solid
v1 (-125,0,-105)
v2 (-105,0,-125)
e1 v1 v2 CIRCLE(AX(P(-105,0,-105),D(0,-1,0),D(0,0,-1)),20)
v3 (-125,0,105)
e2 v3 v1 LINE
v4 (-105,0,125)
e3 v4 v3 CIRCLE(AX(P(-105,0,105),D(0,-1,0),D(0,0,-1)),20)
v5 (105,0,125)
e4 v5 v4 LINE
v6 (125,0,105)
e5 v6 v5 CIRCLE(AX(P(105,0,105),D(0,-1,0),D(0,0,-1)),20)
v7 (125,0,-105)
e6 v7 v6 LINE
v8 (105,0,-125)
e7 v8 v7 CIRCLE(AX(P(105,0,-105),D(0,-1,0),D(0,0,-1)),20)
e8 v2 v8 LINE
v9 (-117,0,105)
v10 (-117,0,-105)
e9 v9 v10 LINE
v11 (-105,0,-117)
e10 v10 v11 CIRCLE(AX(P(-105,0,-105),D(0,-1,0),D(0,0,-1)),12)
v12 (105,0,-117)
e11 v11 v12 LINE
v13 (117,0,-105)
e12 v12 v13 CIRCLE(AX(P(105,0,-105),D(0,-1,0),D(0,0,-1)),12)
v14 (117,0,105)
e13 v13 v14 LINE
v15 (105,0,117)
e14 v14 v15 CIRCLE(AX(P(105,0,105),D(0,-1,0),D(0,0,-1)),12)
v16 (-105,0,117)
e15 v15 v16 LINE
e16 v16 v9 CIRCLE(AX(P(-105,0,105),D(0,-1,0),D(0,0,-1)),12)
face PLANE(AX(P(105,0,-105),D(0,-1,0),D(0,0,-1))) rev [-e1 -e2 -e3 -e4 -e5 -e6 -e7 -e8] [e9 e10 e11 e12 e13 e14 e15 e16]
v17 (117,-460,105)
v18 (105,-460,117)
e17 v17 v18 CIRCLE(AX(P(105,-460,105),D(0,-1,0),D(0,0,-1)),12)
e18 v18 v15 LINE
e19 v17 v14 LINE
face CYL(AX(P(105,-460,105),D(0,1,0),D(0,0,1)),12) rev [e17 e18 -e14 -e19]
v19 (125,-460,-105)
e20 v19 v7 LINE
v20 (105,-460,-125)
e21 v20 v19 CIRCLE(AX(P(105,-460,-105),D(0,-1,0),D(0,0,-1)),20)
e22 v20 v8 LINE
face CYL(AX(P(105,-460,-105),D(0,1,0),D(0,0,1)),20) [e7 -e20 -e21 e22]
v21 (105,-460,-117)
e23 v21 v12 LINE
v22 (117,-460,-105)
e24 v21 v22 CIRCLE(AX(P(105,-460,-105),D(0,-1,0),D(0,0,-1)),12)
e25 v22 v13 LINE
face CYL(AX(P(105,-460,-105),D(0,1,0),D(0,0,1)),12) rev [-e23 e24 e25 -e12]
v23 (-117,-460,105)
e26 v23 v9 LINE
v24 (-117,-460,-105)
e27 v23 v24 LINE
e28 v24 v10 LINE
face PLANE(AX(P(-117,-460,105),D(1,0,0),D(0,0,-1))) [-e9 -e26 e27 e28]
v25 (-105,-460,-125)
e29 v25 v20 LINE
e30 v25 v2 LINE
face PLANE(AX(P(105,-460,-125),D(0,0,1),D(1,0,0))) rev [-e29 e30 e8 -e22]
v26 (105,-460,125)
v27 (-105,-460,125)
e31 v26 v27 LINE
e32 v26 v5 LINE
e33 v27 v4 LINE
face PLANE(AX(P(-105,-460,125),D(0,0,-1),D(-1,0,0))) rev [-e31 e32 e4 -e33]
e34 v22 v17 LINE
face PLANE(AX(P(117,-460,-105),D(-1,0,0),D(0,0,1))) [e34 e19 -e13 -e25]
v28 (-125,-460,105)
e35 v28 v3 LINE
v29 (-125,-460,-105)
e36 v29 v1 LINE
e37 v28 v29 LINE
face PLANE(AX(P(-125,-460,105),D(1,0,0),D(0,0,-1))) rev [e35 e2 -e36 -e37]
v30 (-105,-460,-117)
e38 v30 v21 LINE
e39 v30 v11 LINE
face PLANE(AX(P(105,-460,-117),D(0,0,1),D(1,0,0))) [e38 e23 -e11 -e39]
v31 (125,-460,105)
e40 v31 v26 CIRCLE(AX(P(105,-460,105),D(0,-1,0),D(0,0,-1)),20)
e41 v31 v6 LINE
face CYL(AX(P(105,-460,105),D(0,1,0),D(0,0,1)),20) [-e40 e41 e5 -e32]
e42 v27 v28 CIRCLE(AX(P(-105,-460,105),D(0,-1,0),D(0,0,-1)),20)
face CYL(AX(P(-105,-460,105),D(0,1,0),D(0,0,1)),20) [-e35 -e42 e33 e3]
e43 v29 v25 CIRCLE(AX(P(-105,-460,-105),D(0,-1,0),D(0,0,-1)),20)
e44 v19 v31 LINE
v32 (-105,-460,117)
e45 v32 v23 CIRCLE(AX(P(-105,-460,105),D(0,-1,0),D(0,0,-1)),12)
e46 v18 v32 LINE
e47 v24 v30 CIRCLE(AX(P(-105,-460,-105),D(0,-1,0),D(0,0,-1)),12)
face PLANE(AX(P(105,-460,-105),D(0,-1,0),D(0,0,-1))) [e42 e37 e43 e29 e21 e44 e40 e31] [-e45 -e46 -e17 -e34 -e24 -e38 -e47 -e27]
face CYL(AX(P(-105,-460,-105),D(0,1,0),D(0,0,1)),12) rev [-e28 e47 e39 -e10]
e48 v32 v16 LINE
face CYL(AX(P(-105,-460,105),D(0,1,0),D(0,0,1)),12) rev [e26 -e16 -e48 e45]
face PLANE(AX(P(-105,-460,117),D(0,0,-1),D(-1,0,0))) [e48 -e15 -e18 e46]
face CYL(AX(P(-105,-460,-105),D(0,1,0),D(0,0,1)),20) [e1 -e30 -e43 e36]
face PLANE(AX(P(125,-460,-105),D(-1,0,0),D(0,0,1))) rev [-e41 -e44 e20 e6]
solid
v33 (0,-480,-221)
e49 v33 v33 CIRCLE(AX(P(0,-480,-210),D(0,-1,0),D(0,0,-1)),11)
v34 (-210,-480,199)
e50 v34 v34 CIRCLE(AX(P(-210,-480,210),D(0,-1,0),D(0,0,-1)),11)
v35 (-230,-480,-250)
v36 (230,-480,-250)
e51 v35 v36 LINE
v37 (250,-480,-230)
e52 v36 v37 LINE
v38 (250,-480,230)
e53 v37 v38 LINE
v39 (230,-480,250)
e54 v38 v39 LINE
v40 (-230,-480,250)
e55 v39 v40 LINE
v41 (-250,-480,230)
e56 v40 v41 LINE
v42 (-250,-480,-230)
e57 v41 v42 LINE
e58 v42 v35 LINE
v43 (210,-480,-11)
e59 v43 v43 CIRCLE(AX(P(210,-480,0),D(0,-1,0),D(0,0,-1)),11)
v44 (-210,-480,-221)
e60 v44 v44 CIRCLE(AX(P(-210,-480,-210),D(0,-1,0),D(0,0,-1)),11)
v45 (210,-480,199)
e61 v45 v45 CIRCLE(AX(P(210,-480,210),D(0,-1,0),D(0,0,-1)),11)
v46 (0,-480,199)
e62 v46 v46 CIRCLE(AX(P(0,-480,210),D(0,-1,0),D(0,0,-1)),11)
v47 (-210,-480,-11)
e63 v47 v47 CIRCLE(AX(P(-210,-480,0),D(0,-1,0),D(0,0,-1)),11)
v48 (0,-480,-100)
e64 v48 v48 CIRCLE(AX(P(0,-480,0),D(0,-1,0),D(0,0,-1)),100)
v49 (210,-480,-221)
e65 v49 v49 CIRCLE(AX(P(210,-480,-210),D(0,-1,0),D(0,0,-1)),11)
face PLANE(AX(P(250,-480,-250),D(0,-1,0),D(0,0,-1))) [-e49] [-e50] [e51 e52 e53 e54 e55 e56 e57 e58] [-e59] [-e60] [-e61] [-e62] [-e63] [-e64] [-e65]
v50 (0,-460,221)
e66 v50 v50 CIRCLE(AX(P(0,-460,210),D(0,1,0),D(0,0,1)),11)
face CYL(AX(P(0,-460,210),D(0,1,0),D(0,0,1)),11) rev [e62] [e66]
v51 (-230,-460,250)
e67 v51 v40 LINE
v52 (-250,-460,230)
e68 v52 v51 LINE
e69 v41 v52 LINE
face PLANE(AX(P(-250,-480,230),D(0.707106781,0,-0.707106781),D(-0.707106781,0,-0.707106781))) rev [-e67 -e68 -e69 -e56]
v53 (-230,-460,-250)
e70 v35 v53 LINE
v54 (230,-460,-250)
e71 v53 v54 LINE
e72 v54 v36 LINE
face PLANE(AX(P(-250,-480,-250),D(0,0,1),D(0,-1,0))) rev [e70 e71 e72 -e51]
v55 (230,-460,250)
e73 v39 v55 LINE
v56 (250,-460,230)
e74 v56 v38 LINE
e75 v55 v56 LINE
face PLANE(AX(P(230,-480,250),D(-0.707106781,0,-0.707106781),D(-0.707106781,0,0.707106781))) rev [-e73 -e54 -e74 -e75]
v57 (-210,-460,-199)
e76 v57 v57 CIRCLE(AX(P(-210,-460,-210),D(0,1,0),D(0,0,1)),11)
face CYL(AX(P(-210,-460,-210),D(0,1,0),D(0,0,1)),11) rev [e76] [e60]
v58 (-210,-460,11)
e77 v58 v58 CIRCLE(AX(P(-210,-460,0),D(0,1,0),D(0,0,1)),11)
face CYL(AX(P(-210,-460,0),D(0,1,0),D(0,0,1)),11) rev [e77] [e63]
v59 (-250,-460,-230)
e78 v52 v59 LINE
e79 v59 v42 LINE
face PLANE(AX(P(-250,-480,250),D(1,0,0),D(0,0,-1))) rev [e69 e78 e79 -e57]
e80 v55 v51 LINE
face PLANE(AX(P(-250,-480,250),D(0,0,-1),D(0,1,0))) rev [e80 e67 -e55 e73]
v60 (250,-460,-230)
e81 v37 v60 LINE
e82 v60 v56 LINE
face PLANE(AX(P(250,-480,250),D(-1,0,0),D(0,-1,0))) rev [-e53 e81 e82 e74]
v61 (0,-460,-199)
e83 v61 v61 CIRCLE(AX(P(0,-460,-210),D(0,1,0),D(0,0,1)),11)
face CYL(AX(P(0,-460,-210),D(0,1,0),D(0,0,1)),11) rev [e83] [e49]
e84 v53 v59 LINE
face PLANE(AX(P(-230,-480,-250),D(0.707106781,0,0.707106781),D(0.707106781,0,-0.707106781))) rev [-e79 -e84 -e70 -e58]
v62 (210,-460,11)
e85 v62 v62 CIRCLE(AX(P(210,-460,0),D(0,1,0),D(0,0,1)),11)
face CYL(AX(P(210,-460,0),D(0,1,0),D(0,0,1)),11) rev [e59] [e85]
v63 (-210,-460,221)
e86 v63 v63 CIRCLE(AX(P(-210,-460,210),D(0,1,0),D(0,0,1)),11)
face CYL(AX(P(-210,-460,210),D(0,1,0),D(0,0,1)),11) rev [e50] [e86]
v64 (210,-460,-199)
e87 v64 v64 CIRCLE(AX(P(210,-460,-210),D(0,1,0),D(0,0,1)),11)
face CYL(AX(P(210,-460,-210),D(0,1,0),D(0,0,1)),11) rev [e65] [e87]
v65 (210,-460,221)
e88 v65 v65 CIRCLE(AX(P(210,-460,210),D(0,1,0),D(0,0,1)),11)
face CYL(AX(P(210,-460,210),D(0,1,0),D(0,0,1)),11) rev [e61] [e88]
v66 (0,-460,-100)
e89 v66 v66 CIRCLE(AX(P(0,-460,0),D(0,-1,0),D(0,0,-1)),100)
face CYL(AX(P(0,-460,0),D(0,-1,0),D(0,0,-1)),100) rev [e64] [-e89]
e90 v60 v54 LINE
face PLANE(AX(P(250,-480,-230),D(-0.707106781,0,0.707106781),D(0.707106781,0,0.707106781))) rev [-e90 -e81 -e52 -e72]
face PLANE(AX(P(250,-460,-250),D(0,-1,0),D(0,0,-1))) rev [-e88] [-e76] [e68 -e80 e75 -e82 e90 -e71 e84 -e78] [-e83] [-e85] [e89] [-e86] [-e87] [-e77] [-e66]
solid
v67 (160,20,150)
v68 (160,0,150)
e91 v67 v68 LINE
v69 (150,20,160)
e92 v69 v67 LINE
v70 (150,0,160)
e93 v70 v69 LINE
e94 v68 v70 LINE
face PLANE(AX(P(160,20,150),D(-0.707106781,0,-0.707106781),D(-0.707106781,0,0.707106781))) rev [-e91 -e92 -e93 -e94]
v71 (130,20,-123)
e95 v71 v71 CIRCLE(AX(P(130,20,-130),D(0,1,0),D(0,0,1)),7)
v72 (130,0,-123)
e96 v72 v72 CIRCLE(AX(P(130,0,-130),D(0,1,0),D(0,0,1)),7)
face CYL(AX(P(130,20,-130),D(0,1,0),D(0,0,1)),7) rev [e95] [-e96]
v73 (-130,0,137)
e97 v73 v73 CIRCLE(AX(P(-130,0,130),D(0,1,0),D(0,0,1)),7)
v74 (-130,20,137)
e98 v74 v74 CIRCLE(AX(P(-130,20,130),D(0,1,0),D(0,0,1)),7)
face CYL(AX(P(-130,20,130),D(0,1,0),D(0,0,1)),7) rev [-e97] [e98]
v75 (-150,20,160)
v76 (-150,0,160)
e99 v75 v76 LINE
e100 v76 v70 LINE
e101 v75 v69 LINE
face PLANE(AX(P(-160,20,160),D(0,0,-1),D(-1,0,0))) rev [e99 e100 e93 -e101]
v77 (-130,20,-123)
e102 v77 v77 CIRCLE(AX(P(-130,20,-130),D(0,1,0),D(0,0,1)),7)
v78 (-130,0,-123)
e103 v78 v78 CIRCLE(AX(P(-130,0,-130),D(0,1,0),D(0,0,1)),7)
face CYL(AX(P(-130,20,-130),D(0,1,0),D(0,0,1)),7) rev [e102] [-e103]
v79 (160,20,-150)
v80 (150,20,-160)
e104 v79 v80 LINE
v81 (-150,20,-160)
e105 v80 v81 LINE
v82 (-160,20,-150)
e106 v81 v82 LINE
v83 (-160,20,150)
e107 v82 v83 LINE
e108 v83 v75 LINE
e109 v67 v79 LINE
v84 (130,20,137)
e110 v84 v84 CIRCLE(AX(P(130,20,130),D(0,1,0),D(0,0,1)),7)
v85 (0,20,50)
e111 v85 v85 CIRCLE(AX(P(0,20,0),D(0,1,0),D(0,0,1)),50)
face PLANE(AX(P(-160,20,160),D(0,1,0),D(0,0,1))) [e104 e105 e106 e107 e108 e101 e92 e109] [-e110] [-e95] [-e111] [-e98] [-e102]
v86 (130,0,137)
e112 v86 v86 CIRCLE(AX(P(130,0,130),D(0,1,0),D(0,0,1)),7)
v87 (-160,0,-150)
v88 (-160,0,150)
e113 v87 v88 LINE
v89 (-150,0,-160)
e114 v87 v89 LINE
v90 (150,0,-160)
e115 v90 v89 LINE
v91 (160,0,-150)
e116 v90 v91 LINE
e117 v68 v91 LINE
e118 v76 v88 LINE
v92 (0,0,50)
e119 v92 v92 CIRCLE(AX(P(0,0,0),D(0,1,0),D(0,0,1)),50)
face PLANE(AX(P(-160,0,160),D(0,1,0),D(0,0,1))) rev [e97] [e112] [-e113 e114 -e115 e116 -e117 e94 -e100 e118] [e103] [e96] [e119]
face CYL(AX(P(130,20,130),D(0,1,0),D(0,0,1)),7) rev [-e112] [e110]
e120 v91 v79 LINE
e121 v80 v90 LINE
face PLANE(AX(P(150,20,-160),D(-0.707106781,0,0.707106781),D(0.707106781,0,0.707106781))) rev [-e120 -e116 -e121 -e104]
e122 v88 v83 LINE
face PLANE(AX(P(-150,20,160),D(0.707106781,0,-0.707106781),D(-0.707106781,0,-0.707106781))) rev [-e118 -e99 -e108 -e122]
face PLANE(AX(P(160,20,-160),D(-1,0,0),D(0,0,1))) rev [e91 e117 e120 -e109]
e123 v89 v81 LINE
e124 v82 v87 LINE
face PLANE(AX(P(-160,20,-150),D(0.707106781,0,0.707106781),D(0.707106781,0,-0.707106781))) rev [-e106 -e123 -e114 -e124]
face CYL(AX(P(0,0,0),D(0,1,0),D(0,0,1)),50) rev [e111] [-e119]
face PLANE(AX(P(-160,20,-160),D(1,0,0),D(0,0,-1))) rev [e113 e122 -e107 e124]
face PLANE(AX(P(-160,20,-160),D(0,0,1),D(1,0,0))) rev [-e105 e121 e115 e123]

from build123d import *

# Parameters (mm, degrees)
SKETCH_1_W                       = 320
SKETCH_1_H                       = 320
EXTRUDE_1_DEPTH                  = 20
SKETCH_2_R                       = 50
CUT_EXTRUDE_1_DEPTH              = 20
CHAMFER_1_SIZE                   = 10
MEMBER_1_DEPTH                   = 460
SKETCH_15_W                      = 500
SKETCH_15_H                      = 500
EXTRUDE_6_DEPTH                  = 20
CHAMFER_3_SIZE                   = 20
HOLE_WIZARD_22_0_22_2_AT_2_COUNT = 2
HOLE_WIZARD_22_0_22_2_AT_2_PITCH = 420
HOLE_WIZARD_22_0_22_2_AT_3_COUNT = 2
HOLE_WIZARD_22_0_22_2_AT_3_PITCH = 420
HOLE_WIZARD_22_0_22_2_AT_4_COUNT = 2
HOLE_WIZARD_22_0_22_2_AT_4_PITCH = 593.969696197
HOLE_WIZARD_22_0_22_2_AT_5_COUNT = 2
HOLE_WIZARD_22_0_22_2_AT_5_PITCH = 210
HOLE_WIZARD_22_0_22_2_AT_6_COUNT = 2
HOLE_WIZARD_22_0_22_2_AT_6_PITCH = 469.574275275
HOLE_WIZARD_22_0_22_2_AT_7_COUNT = 2
HOLE_WIZARD_22_0_22_2_AT_7_PITCH = 469.574275275
HOLE_WIZARD_22_0_22_2_AT_8_COUNT = 2
HOLE_WIZARD_22_0_22_2_AT_8_PITCH = 210
SKETCH_18_R                      = 100
CUT_EXTRUDE_4_DEPTH              = 20
HOLE_WIZARD_M16_2_OUTLINE_R      = 7
HOLE_WIZARD_M16_2_DEPTH          = 20


# Read off the part's stored shape, not the designer's step: M16 螺纹孔2
with BuildPart() as part:
    # 草图1 → 凸台-拉伸1 (new body)
    with BuildSketch(Plane(origin=(0, 0, 0), x_dir=(1, 0, 0), z_dir=(0, 1, 0))):
        Rectangle(SKETCH_1_W, SKETCH_1_H)
    extrude(amount=EXTRUDE_1_DEPTH)

    # 草图2 → 切除-拉伸1 (cut)
    with BuildSketch(Plane(origin=(0, 20, 0), x_dir=(1, 0, 0), z_dir=(0, 1, 0))):
        with Locations(Location((0, 0, 0), (0, 0, 270))):
            Circle(SKETCH_2_R)
    extrude(amount=-CUT_EXTRUDE_1_DEPTH, mode=Mode.SUBTRACT)

    # 倒角1
    chamfer_1_edges = [part.edges().sort_by_distance(p)[0] for p in [
        (-160, 10, -160),
        (160, 10, -160),
        (160, 10, 160),
        (-160, 10, 160),
    ]]
    chamfer(chamfer_1_edges, length=CHAMFER_1_SIZE)

    # M16 螺纹孔2 outline → M16 螺纹孔2 (cut)
    with BuildSketch(Plane(origin=(0, 0, 0), x_dir=(1, 0, 0), z_dir=(0, 1, 0))):
        with Locations((130, 130)):
            Circle(HOLE_WIZARD_M16_2_OUTLINE_R)
        with Locations((-130, -130)):
            Circle(HOLE_WIZARD_M16_2_OUTLINE_R)
        with Locations((-130, 130)):
            Circle(HOLE_WIZARD_M16_2_OUTLINE_R)
        with Locations((130, -130)):
            Circle(HOLE_WIZARD_M16_2_OUTLINE_R)
    extrude(amount=HOLE_WIZARD_M16_2_DEPTH, mode=Mode.SUBTRACT)


with BuildPart() as body_2:
    # Sketch11 → Member 1 (new body)
    with BuildSketch(Plane(origin=(0, 0, 0), x_dir=(0, 0, -1), z_dir=(0, -1, 0))):
        with BuildLine():
            Line((-105, -125), (105, -125))
            ThreePointArc((105, -125), (119.142135624, -119.142135624), (125, -105))
            Line((125, -105), (125, 105))
            ThreePointArc((125, 105), (119.142135624, 119.142135624), (105, 125))
            Line((105, 125), (-105, 125))
            ThreePointArc((-105, 125), (-119.142135624, 119.142135624), (-125, 105))
            Line((-125, 105), (-125, -105))
            ThreePointArc((-125, -105), (-119.142135624, -119.142135624), (-105, -125))
        make_face()
        with BuildLine():
            Line((-105, -117), (105, -117))
            ThreePointArc((105, -117), (113.485281374, -113.485281374), (117, -105))
            Line((117, -105), (117, 105))
            ThreePointArc((117, 105), (113.485281374, 113.485281374), (105, 117))
            Line((105, 117), (-105, 117))
            ThreePointArc((-105, 117), (-113.485281374, 113.485281374), (-117, 105))
            Line((-117, 105), (-117, -105))
            ThreePointArc((-117, -105), (-113.485281374, -113.485281374), (-105, -117))
        make_face(mode=Mode.SUBTRACT)
    extrude(amount=MEMBER_1_DEPTH)


with BuildPart() as body_3:
    # 草图15 → 凸台-拉伸6 (new body)
    with BuildSketch(Plane.XZ.offset(460)):
        Rectangle(SKETCH_15_W, SKETCH_15_H)
    extrude(amount=EXTRUDE_6_DEPTH)

    # 倒角3
    chamfer_3_edges = [body_3.edges().sort_by_distance(p)[0] for p in [
        (250, -470, -250),
        (-250, -470, -250),
        (-250, -470, 250),
        (250, -470, 250),
    ]]
    chamfer(chamfer_3_edges, length=CHAMFER_3_SIZE)

    # 草图16 → Ø22.0 (22) 直径孔2 (revolve, cut)
    with BuildSketch(Plane(origin=(-210, -460, -210), x_dir=(0, 0, 1), z_dir=(1, 0, 0))):
        Polygon((0, 0), (0, 86.609466809), (11, 80), (11, 0), align=None)
    hole_wizard_22_0_22_2 = revolve(axis=Axis((-210, -453.65, -210), (0, -1, 0)), mode=Mode.SUBTRACT)

    # Ø22.0 (22) 直径孔2 at 2: Ø22.0 (22) 直径孔2 ×2
    with Locations(*[(i * HOLE_WIZARD_22_0_22_2_AT_2_PITCH, 0, 0) for i in range(1, HOLE_WIZARD_22_0_22_2_AT_2_COUNT)]):
        add(hole_wizard_22_0_22_2, mode=Mode.SUBTRACT)

    # Ø22.0 (22) 直径孔2 at 3: Ø22.0 (22) 直径孔2 ×2
    with Locations(*[(0, 0, i * HOLE_WIZARD_22_0_22_2_AT_3_PITCH) for i in range(1, HOLE_WIZARD_22_0_22_2_AT_3_COUNT)]):
        add(hole_wizard_22_0_22_2, mode=Mode.SUBTRACT)

    # Ø22.0 (22) 直径孔2 at 4: Ø22.0 (22) 直径孔2 ×2
    with Locations(*[Vector(0.7071067811865476, 0, 0.7071067811865476) * (i * HOLE_WIZARD_22_0_22_2_AT_4_PITCH) for i in range(1, HOLE_WIZARD_22_0_22_2_AT_4_COUNT)]):
        add(hole_wizard_22_0_22_2, mode=Mode.SUBTRACT)

    # Ø22.0 (22) 直径孔2 at 5: Ø22.0 (22) 直径孔2 ×2
    with Locations(*[(i * HOLE_WIZARD_22_0_22_2_AT_5_PITCH, 0, 0) for i in range(1, HOLE_WIZARD_22_0_22_2_AT_5_COUNT)]):
        add(hole_wizard_22_0_22_2, mode=Mode.SUBTRACT)

    # Ø22.0 (22) 直径孔2 at 6: Ø22.0 (22) 直径孔2 ×2
    with Locations(*[Vector(0.4472135954999578, 0, 0.894427190999916) * (i * HOLE_WIZARD_22_0_22_2_AT_6_PITCH) for i in range(1, HOLE_WIZARD_22_0_22_2_AT_6_COUNT)]):
        add(hole_wizard_22_0_22_2, mode=Mode.SUBTRACT)

    # Ø22.0 (22) 直径孔2 at 7: Ø22.0 (22) 直径孔2 ×2
    with Locations(*[Vector(0.8944271909999159, 0, 0.447213595499958) * (i * HOLE_WIZARD_22_0_22_2_AT_7_PITCH) for i in range(1, HOLE_WIZARD_22_0_22_2_AT_7_COUNT)]):
        add(hole_wizard_22_0_22_2, mode=Mode.SUBTRACT)

    # Ø22.0 (22) 直径孔2 at 8: Ø22.0 (22) 直径孔2 ×2
    with Locations(*[(0, 0, i * HOLE_WIZARD_22_0_22_2_AT_8_PITCH) for i in range(1, HOLE_WIZARD_22_0_22_2_AT_8_COUNT)]):
        add(hole_wizard_22_0_22_2, mode=Mode.SUBTRACT)

    # 草图18 → 切除-拉伸4 (cut)
    with BuildSketch(Plane.XZ.offset(480)):
        with Locations(Location((0, 0, 0), (0, 0, 270))):
            Circle(SKETCH_18_R)
    extrude(amount=-CUT_EXTRUDE_4_DEPTH, mode=Mode.SUBTRACT)


solid = Compound([part.part, body_2.part, body_3.part])
